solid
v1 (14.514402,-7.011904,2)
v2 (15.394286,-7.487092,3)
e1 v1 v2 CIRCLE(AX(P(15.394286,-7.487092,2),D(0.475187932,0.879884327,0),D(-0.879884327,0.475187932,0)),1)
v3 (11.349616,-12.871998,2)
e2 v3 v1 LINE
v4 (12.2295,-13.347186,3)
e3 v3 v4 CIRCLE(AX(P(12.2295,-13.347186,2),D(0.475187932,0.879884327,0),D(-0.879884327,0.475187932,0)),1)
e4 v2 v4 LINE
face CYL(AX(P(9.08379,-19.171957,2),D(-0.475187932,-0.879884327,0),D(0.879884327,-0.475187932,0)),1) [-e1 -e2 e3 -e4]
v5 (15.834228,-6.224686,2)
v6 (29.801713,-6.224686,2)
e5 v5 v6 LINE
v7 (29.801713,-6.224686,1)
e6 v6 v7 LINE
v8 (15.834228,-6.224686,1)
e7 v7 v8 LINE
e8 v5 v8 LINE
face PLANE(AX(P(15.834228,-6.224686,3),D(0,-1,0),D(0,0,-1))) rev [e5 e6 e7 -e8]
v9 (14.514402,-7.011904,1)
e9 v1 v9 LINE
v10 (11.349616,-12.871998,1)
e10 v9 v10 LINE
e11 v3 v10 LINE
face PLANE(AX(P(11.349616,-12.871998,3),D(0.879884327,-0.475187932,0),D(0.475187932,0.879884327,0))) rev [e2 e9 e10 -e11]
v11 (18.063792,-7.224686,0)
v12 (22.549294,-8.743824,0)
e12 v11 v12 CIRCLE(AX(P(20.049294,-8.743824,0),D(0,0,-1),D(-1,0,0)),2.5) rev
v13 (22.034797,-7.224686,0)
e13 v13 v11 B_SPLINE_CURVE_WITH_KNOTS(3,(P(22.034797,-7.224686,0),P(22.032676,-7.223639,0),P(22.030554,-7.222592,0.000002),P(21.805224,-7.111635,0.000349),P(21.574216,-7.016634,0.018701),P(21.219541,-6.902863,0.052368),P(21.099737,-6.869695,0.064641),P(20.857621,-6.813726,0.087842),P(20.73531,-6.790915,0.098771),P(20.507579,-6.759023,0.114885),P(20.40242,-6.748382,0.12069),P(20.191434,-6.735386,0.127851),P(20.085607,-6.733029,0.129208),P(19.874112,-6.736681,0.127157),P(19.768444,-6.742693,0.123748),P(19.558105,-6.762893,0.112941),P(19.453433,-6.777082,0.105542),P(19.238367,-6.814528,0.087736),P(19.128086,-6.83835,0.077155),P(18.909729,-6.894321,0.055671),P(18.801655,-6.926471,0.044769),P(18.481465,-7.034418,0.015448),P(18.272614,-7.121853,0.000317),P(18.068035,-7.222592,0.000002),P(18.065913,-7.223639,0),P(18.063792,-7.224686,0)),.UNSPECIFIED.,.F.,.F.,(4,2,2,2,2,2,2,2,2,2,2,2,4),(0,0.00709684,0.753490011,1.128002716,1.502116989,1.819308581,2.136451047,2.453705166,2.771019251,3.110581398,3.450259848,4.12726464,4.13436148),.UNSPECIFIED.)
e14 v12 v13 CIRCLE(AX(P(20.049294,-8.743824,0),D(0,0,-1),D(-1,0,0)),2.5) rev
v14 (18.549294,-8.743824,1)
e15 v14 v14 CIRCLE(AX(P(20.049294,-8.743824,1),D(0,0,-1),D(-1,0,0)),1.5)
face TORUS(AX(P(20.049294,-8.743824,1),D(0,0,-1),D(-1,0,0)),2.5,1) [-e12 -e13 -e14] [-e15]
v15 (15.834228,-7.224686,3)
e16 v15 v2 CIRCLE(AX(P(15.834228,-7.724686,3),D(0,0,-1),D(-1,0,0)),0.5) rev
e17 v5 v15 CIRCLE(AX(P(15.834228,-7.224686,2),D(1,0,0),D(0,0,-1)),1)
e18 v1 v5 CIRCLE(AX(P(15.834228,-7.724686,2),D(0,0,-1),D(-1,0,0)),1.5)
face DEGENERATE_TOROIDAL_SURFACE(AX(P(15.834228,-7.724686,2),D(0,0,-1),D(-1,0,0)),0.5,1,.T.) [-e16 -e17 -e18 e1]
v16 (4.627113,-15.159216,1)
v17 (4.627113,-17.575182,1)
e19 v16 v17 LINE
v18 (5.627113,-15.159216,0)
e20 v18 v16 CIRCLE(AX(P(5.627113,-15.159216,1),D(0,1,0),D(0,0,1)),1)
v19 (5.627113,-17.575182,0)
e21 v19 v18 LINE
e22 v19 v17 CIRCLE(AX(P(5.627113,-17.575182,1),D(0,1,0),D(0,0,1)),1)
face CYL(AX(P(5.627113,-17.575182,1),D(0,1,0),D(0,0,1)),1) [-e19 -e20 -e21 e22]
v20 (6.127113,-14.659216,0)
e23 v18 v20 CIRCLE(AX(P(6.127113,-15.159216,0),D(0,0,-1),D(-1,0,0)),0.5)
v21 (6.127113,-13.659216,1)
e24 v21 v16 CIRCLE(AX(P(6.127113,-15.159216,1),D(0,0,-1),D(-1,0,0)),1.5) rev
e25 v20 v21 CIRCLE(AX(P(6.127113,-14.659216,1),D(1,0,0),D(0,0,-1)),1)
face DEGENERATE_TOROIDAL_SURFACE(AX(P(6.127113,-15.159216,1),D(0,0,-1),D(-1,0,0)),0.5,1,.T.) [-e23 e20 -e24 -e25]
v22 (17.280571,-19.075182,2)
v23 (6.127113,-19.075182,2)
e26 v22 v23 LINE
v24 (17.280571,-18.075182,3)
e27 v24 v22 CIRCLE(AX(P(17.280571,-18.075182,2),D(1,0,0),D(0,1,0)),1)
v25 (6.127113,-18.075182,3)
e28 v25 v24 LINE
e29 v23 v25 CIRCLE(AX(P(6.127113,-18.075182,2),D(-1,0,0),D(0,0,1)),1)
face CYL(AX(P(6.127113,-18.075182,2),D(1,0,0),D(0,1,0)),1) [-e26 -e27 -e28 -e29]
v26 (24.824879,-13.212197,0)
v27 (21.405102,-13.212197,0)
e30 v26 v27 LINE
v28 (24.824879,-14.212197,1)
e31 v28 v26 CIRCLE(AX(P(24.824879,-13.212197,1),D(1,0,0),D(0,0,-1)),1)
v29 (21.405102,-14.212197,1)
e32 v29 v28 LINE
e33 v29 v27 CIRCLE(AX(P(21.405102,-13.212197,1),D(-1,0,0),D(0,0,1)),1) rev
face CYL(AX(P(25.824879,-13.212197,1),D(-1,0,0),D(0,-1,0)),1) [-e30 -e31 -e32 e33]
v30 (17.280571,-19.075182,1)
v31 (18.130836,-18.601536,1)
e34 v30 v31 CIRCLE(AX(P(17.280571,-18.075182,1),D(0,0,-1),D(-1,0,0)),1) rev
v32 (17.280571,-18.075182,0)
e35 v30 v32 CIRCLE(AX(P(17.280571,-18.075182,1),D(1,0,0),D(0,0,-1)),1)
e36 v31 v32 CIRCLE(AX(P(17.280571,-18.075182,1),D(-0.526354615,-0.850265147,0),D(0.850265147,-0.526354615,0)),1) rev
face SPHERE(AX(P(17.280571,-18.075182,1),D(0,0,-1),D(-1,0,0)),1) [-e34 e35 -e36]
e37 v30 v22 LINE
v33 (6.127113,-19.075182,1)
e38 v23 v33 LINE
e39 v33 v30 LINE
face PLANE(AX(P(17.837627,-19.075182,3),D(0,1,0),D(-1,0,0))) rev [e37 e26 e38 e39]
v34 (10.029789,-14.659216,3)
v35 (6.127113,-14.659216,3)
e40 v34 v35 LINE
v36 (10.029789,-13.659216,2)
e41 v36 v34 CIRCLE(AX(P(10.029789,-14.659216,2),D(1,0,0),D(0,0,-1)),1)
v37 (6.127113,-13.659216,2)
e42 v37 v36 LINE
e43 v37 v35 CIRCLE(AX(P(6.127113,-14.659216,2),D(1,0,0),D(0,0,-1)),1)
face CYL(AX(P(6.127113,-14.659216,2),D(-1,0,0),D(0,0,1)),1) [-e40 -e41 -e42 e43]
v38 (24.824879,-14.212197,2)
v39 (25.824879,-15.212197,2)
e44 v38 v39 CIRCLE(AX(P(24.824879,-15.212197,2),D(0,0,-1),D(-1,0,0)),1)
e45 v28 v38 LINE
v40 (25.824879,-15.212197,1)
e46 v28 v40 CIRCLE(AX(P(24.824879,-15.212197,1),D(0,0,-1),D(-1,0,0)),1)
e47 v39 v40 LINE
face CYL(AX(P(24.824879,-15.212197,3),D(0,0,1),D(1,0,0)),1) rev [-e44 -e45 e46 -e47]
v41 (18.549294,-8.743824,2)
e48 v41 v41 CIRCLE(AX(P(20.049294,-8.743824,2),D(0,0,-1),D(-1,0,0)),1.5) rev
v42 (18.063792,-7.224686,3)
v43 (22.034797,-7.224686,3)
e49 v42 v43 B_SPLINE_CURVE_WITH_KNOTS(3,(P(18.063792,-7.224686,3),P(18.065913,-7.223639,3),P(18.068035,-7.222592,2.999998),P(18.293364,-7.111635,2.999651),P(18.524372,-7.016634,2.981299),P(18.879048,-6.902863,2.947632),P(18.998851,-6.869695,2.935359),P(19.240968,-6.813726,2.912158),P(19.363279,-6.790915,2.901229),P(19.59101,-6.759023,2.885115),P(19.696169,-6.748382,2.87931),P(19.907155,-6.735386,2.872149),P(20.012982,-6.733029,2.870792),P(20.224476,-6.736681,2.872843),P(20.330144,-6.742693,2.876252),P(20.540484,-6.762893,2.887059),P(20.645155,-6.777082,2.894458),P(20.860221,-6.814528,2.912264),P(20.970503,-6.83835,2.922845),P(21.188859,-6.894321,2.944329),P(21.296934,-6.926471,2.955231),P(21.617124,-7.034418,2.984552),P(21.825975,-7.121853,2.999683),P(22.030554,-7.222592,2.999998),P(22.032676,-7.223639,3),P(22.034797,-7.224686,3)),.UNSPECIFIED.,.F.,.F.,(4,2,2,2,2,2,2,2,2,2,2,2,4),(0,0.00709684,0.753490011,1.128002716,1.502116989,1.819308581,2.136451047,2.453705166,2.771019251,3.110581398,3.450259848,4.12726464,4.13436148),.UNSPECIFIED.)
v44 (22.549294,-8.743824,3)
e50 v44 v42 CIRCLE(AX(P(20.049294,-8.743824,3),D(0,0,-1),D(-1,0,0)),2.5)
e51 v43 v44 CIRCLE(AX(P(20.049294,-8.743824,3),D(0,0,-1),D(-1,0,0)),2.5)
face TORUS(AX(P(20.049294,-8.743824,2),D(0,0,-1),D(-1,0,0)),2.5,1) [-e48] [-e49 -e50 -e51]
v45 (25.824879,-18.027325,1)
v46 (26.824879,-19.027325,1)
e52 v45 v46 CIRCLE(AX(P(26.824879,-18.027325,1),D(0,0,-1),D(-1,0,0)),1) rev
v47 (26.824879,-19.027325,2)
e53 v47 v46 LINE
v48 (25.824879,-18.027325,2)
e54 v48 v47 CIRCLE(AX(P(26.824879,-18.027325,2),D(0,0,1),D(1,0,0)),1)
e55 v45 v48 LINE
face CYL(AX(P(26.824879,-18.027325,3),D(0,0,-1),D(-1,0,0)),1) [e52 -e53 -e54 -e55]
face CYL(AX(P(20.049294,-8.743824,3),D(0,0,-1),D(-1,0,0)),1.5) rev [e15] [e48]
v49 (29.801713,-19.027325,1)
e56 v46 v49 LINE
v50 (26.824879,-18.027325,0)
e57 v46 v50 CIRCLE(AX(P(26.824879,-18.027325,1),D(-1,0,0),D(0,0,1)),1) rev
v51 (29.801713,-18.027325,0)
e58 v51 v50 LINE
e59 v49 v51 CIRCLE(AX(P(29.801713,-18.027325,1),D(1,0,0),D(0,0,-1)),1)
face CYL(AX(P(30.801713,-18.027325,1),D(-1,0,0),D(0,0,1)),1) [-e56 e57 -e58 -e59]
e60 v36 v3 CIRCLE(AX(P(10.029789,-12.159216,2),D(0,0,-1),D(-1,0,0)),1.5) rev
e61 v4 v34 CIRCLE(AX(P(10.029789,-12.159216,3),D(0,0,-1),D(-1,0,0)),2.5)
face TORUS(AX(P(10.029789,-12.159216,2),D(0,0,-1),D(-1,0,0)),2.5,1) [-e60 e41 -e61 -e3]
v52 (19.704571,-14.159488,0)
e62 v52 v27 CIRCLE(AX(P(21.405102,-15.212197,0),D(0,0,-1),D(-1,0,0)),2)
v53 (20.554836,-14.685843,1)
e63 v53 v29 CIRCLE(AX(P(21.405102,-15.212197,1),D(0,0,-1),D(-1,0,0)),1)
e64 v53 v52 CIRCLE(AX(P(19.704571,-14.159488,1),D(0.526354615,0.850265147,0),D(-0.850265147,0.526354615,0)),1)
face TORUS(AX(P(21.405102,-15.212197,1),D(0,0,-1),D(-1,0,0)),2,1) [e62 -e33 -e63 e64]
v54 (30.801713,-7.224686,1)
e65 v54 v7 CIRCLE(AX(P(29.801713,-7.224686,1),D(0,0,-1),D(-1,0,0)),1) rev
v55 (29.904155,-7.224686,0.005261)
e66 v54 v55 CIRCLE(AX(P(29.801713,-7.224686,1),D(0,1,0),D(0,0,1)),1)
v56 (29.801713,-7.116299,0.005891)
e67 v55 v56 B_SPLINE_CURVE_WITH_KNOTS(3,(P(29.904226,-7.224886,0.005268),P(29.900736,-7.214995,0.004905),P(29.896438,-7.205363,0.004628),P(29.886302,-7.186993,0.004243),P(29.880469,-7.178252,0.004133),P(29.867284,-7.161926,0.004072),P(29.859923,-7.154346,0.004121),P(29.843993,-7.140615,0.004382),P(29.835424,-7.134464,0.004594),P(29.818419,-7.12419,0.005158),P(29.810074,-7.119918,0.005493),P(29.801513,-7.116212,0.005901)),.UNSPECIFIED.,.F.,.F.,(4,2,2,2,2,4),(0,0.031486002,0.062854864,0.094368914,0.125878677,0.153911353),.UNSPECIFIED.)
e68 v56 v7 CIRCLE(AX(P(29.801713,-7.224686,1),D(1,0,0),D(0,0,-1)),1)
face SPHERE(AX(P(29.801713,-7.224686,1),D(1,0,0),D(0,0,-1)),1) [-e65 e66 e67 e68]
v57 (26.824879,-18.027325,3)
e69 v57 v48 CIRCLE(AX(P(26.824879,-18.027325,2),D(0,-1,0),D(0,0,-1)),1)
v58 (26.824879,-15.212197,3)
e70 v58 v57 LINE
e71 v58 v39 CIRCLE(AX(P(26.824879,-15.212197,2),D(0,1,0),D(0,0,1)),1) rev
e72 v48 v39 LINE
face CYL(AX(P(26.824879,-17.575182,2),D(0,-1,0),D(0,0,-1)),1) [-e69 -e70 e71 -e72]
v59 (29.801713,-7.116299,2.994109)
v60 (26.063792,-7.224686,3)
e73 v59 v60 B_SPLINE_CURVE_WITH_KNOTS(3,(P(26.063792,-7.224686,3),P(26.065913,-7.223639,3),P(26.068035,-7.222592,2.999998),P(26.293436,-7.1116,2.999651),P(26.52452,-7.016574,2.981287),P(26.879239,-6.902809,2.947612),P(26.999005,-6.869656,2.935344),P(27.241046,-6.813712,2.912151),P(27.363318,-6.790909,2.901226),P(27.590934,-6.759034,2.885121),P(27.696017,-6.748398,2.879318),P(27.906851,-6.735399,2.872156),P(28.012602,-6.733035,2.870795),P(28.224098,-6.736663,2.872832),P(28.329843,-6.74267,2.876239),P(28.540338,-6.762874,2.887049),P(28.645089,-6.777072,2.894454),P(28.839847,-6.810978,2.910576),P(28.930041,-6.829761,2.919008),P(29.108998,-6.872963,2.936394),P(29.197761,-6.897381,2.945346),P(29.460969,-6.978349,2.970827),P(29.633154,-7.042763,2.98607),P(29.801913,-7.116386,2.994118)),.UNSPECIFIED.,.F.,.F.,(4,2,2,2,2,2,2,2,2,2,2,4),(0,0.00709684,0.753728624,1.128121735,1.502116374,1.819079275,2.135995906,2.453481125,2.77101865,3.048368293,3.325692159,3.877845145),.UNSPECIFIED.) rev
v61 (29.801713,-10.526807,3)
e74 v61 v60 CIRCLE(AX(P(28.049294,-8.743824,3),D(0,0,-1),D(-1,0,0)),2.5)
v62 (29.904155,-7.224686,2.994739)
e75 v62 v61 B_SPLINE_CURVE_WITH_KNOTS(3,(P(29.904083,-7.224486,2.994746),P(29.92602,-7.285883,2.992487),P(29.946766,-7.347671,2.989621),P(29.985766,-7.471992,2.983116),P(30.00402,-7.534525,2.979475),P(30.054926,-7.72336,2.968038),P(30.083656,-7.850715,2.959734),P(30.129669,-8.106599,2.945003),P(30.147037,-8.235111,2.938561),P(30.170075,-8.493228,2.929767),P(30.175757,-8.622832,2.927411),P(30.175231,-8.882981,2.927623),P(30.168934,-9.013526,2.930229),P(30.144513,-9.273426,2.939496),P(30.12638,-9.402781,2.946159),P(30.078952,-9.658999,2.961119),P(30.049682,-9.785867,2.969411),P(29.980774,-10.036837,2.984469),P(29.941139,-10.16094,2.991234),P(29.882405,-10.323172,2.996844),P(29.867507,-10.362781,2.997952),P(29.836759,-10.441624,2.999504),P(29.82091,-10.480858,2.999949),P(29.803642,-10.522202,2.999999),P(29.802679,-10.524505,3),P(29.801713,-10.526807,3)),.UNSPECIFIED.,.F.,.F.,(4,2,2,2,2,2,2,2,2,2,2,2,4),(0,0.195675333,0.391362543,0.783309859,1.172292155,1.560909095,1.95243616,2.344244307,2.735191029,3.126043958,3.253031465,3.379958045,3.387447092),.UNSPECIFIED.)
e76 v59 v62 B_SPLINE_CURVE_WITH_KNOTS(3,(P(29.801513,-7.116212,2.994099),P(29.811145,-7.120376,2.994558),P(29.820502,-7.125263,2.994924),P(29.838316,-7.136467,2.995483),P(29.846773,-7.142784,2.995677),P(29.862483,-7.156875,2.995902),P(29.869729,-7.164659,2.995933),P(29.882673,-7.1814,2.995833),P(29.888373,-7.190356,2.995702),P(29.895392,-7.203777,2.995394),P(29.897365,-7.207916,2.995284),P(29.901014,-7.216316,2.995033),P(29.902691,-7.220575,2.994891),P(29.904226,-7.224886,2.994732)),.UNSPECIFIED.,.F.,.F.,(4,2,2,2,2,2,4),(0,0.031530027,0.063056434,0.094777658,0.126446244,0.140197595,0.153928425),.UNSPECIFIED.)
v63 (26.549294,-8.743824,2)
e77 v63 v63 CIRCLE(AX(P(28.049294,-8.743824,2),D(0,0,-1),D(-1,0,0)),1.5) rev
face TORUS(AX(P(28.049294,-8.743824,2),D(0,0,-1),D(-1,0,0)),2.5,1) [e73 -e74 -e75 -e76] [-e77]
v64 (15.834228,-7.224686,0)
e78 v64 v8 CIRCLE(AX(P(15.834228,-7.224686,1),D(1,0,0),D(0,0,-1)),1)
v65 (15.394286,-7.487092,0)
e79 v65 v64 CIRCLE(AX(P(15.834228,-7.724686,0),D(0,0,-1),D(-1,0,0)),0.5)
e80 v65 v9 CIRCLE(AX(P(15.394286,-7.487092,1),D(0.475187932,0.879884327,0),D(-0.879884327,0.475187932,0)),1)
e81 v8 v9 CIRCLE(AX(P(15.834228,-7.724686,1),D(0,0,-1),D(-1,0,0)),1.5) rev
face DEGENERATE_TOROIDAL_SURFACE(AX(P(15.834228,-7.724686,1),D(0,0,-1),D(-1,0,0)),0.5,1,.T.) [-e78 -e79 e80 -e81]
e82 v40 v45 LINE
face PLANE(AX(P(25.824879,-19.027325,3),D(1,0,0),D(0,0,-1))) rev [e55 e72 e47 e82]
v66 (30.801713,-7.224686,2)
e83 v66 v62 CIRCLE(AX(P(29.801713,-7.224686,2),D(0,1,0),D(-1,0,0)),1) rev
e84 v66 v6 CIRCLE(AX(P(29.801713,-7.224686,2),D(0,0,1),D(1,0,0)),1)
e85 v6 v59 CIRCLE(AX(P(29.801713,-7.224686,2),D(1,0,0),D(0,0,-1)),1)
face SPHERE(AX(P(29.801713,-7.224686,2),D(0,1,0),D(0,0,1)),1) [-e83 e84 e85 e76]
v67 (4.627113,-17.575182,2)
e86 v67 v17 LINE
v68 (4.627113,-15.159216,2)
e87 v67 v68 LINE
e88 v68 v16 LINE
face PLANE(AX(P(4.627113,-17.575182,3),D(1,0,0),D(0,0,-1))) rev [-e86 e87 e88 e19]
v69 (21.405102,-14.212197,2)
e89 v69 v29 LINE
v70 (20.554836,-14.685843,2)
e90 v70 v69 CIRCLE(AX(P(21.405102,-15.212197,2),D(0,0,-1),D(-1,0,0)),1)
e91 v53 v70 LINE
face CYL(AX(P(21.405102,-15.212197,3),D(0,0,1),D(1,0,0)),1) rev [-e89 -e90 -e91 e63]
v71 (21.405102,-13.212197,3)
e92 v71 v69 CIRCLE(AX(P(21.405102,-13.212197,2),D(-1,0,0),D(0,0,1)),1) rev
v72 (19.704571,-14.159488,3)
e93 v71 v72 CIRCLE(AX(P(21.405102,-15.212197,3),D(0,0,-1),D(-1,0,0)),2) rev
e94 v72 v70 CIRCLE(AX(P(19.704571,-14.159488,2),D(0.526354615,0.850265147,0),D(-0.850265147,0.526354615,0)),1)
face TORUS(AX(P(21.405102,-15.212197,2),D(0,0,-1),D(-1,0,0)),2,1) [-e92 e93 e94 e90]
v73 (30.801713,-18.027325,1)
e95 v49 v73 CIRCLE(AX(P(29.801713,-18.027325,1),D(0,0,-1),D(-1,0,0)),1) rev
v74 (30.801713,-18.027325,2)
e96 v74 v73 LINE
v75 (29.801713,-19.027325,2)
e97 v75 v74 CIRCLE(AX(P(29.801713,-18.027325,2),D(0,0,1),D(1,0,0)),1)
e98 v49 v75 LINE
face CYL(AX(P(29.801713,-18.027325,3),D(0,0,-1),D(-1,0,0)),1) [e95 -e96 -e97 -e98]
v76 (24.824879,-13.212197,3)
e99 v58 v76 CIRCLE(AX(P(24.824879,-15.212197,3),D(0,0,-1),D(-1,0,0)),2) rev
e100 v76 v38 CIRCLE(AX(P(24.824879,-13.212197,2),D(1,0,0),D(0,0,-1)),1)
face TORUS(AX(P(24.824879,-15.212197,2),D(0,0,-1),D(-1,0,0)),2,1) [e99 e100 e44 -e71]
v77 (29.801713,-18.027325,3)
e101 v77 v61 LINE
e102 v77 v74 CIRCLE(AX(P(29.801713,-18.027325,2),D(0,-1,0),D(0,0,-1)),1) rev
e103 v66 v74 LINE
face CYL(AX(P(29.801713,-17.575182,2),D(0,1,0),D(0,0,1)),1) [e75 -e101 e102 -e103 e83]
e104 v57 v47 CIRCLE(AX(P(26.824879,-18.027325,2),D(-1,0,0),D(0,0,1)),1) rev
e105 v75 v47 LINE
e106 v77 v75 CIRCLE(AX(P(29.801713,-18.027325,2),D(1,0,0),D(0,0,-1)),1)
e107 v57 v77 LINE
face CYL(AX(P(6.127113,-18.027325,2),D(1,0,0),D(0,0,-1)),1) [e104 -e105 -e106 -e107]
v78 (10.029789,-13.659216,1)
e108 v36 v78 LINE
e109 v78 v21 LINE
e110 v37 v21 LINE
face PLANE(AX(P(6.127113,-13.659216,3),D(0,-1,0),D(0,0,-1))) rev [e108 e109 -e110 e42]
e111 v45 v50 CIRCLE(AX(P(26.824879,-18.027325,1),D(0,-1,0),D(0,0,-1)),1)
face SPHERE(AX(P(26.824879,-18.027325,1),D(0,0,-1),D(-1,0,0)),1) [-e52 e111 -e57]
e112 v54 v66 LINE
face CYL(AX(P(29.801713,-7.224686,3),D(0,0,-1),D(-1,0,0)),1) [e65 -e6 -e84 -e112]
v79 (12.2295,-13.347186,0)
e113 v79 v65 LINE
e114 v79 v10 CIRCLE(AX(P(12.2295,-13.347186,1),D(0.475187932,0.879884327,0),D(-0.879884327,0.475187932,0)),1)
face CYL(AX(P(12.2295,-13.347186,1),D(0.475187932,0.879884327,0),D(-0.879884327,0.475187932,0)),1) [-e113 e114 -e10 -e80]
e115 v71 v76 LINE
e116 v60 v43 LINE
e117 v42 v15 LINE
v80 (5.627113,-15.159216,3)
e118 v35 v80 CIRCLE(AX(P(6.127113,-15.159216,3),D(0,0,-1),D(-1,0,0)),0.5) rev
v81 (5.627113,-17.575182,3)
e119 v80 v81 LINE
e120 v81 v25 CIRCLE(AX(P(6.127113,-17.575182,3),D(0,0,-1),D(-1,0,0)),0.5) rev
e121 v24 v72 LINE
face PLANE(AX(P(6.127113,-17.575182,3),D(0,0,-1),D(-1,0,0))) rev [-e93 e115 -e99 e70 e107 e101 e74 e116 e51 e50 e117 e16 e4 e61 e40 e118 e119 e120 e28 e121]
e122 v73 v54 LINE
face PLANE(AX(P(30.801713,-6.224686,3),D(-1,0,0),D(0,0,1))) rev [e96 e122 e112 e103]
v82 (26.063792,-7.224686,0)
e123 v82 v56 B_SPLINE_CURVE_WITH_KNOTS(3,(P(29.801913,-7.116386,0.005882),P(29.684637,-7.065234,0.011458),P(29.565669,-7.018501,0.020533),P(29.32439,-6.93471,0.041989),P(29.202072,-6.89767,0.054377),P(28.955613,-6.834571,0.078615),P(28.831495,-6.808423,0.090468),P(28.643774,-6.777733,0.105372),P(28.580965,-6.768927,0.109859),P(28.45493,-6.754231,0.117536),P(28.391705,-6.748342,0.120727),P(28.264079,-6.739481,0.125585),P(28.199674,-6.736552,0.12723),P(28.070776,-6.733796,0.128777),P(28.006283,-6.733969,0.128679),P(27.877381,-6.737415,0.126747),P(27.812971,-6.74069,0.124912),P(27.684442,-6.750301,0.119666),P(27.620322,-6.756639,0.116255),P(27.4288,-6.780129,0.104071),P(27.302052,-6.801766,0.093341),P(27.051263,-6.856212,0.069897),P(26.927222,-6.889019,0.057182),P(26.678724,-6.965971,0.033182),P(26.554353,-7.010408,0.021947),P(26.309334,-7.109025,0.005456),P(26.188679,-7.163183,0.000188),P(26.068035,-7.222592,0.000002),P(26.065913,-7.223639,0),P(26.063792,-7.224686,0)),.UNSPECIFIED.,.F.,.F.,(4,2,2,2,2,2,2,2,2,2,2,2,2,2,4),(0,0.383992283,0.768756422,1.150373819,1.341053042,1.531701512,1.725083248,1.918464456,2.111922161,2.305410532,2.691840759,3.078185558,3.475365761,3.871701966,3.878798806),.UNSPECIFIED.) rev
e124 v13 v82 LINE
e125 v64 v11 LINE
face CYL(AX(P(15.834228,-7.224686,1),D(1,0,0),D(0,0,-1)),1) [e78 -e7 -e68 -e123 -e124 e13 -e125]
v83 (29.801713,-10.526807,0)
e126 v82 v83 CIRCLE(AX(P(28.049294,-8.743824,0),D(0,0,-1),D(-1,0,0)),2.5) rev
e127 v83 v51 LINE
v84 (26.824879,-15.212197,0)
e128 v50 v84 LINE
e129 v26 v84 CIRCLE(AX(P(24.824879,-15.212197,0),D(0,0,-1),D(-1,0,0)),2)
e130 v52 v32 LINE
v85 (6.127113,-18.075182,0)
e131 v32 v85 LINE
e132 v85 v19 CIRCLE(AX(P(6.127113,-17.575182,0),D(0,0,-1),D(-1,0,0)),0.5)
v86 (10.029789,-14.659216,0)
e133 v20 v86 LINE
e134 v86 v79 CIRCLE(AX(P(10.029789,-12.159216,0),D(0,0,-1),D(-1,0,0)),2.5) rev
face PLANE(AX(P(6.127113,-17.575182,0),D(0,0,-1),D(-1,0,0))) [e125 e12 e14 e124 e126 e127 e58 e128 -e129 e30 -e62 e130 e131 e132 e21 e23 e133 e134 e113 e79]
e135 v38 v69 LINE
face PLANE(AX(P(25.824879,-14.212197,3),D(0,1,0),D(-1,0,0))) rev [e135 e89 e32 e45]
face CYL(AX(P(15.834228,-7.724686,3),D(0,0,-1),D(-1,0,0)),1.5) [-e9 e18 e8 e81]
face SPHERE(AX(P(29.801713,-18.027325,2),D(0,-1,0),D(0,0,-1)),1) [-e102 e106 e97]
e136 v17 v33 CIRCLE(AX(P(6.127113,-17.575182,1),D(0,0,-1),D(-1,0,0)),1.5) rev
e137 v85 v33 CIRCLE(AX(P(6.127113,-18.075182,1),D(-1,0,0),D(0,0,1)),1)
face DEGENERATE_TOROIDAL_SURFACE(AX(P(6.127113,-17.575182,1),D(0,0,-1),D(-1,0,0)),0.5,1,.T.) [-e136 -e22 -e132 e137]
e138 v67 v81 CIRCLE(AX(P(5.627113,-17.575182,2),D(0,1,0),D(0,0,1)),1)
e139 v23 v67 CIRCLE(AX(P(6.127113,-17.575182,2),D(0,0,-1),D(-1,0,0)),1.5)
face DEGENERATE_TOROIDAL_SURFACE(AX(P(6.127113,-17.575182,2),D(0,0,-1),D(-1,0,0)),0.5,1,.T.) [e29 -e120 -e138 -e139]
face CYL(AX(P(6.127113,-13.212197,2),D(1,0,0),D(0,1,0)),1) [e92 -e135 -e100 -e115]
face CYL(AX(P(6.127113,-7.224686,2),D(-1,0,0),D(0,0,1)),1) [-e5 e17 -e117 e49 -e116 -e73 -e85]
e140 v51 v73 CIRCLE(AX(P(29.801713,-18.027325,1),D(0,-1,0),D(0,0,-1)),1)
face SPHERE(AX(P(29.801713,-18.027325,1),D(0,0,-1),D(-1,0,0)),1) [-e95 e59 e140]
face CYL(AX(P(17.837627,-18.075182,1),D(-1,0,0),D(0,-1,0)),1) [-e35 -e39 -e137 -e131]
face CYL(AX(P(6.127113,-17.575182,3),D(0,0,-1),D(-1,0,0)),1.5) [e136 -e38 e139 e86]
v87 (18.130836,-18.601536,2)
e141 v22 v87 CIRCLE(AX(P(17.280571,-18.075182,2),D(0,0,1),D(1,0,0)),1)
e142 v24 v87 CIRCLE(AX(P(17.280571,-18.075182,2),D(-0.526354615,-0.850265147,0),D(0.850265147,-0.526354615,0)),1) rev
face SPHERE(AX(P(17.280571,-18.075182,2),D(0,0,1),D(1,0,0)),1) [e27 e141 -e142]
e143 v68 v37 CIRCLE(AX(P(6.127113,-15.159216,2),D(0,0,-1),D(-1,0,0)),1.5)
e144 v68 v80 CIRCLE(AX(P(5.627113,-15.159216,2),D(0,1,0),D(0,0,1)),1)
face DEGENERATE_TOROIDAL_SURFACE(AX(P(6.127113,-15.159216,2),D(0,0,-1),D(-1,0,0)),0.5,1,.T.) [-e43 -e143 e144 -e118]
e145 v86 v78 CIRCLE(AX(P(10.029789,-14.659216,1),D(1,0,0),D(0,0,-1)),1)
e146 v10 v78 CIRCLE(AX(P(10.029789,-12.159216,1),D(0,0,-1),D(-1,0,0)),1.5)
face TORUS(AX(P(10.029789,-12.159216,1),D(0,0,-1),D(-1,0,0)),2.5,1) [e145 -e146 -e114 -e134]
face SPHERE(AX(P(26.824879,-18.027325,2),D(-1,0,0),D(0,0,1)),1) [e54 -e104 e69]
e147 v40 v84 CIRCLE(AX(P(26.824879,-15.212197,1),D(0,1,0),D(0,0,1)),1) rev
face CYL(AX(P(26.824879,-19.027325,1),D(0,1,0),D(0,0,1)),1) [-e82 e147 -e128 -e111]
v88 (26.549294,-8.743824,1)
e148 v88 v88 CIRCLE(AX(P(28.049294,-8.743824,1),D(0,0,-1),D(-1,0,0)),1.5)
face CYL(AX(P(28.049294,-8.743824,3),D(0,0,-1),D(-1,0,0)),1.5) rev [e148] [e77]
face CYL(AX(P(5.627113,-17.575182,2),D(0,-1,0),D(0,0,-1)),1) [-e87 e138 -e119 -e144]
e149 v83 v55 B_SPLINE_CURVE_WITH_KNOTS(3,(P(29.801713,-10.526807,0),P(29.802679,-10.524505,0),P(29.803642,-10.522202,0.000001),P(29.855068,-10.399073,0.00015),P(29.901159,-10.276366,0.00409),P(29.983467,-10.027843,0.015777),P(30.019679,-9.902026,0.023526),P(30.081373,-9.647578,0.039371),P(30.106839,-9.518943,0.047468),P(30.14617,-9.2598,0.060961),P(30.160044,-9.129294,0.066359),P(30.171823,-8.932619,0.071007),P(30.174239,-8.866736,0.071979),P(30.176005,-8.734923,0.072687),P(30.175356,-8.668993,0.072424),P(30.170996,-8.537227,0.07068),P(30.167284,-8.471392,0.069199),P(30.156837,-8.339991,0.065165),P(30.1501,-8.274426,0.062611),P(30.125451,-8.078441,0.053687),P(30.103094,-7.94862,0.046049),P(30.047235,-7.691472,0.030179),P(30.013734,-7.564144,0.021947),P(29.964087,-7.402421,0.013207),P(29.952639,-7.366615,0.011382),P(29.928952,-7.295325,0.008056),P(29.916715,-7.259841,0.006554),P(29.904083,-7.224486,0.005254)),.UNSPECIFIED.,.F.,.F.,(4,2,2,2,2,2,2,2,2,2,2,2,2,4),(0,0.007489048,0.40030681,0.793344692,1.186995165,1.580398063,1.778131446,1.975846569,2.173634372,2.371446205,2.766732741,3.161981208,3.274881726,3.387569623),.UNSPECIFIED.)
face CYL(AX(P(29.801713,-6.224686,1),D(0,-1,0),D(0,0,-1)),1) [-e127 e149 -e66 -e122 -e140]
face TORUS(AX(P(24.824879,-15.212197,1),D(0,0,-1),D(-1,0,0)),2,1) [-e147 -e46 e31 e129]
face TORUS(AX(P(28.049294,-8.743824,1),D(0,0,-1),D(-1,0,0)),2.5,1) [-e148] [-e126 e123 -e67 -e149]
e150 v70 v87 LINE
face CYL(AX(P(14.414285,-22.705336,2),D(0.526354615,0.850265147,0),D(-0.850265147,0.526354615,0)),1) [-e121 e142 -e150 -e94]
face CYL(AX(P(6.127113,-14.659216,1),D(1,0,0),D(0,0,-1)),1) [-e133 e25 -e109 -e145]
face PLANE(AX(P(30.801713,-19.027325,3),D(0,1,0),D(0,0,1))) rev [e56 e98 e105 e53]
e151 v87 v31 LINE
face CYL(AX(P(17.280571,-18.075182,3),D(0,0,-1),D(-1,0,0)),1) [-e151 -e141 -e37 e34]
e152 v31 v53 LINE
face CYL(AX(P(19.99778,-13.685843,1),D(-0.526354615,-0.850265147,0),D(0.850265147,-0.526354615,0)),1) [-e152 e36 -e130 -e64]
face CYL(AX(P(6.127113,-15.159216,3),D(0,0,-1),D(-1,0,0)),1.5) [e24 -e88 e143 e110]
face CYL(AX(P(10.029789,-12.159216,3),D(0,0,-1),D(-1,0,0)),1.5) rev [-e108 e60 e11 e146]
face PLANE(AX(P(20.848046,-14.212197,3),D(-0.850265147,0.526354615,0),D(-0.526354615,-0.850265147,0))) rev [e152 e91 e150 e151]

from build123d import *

# Parameters (mm, degrees)
SKETCH1_R           = 1.5
BOSS_EXTRUDE1_DEPTH = 3
FILLET1_R           = 1


with BuildPart() as part:
    # Sketch1 → Boss-Extrude1 (new body)
    with BuildSketch(Plane.XY):
        with BuildLine():
            Line((15.834228158, -6.224686262), (30.801713335, -6.224686262))
            Line((30.801713335, -6.224686262), (30.801713335, -19.027324957))
            Line((30.801713335, -19.027324957), (25.824879418, -19.027324957))
            Line((25.824879418, -19.027324957), (25.824879418, -14.212197487))
            Line((25.824879418, -14.212197487), (20.8480455, -14.212197487))
            Line((20.8480455, -14.212197487), (17.837626699, -19.075181704))
            Line((17.837626699, -19.075181704), (6.127112784, -19.075181704))
            ThreePointArc((6.127112784, -19.075181704), (5.066452612, -18.635841876), (4.627112784, -17.575181704))
            Line((4.627112784, -17.575181704), (4.627112784, -15.15921594))
            ThreePointArc((4.627112784, -15.15921594), (5.066452612, -14.098555769), (6.127112784, -13.65921594))
            Line((6.127112784, -13.65921594), (10.029789066, -13.65921594))
            ThreePointArc((10.029789066, -13.65921594), (10.798172809, -13.447465304), (11.349615557, -12.871997838))
            Line((11.349615557, -12.871997838), (14.514401667, -7.011904364))
            ThreePointArc((14.514401667, -7.011904364), (15.065844415, -6.436436898), (15.834228158, -6.224686262))
        make_face()
        with Locations((20.049294378, -8.743824417)):
            Circle(SKETCH1_R, mode=Mode.SUBTRACT)
        with Locations((28.049294378, -8.743824417)):
            Circle(SKETCH1_R, mode=Mode.SUBTRACT)
    extrude(amount=BOSS_EXTRUDE1_DEPTH)

    # Fillet1
    # the kernel refuses this fillet: 1 mm, written as the material it adds along each edge
    with BuildSketch(Plane(origin=(25.824879418, -14.212197487, 0), x_dir=(0, -1, 0), z_dir=(0, 0, 1))) as fillet1_piece_1:
        with BuildLine():
            CenterArc((FILLET1_R, -FILLET1_R), FILLET1_R, 90, 90)
            Line((0, -FILLET1_R), (0, 0))
            Line((0, 0), (FILLET1_R, 0))
        make_face()
    extrude(amount=3)
    with BuildSketch(Plane(origin=(20.8480455, -14.212197487, 0), x_dir=(1, 0, 0), z_dir=(0, 0, 1))) as fillet1_piece_2:
        with BuildLine():
            CenterArc((FILLET1_R * 0.557056098593, -FILLET1_R), FILLET1_R, 90, 58.240519915)
            Line((-FILLET1_R * 0.293209048095, -FILLET1_R * 0.473645385384), (0, 0))
            Line((0, 0), (FILLET1_R * 0.557056098593, 0))
        make_face()
    extrude(amount=3)
    # the kernel refuses this fillet: 1 mm, written as the material it takes off along each edge
    with BuildSketch(Plane(origin=(29.801713335, -18.027324957, 1), x_dir=(1, 0, 0), z_dir=(0, -1, 0))) as fillet1_2_piece_1_section:
        Polygon((0, 0), (FILLET1_R, 0), (FILLET1_R, -FILLET1_R), (0, -FILLET1_R), align=None)
    fillet1_2_piece_1 = extrude(amount=FILLET1_R, mode=Mode.PRIVATE)
    fillet1_2_piece_1 = fillet1_2_piece_1 - Plane(origin=(29.801713335, -18.027324957, 1), x_dir=(-0.7071067811865475, 0, 0.7071067811865475), z_dir=(0, -1, 0)) * Sphere(FILLET1_R, mode=Mode.PRIVATE)
    add(fillet1_2_piece_1, mode=Mode.SUBTRACT)
    with BuildSketch(Plane(origin=(26.824879418, -18.027324957, 1), x_dir=(0, 0, -1), z_dir=(0, -1, 0))) as fillet1_2_piece_2_section:
        Polygon((0, 0), (FILLET1_R, 0), (FILLET1_R, -FILLET1_R), (0, -FILLET1_R), align=None)
    fillet1_2_piece_2 = extrude(amount=FILLET1_R, mode=Mode.PRIVATE)
    fillet1_2_piece_2 = fillet1_2_piece_2 - Plane(origin=(26.824879418, -18.027324957, 1), x_dir=(0.7071067811865475, 0, 0.7071067811865475), z_dir=(0, -1, 0)) * Sphere(FILLET1_R, mode=Mode.PRIVATE)
    add(fillet1_2_piece_2, mode=Mode.SUBTRACT)
    with BuildSketch(Plane(origin=(17.280570601, -18.075181704, 1), x_dir=(0.8502651466878635, -0.5263546146162928, 0), z_dir=(0, 0, -1))) as fillet1_2_piece_3_section:
        Polygon((0, 0), (FILLET1_R, 0), (FILLET1_R, FILLET1_R * 0.557056098593), (FILLET1_R * 0.526354614616, FILLET1_R * 0.850265146688), align=None)
    fillet1_2_piece_3 = extrude(amount=FILLET1_R, mode=Mode.PRIVATE)
    fillet1_2_piece_3 = fillet1_2_piece_3 - Plane(origin=(17.280570601, -18.075181704, 1), x_dir=(-0.48664431846252326, 0.8736001987798231, 0), z_dir=(0, 0, -1)) * Sphere(FILLET1_R, mode=Mode.PRIVATE)
    add(fillet1_2_piece_3, mode=Mode.SUBTRACT)
    with BuildSketch(Plane(origin=(29.801713335, -7.224686262, 1), x_dir=(1, 0, 0), z_dir=(0, 1, 0))) as fillet1_2_piece_4_section:
        Polygon((0, 0), (FILLET1_R, 0), (FILLET1_R, FILLET1_R), (0, FILLET1_R), align=None)
    fillet1_2_piece_4 = extrude(amount=FILLET1_R, mode=Mode.PRIVATE)
    fillet1_2_piece_4 = fillet1_2_piece_4 - Plane(origin=(29.801713335, -7.224686262, 1), x_dir=(-0.7071067811865475, 0, 0.7071067811865475), z_dir=(0, 1, 0)) * Sphere(FILLET1_R, mode=Mode.PRIVATE)
    add(fillet1_2_piece_4, mode=Mode.SUBTRACT)
    with BuildSketch(Plane(origin=(29.801713335, -18.027324957, 2), x_dir=(0, -1, 0), z_dir=(1, 0, 0))) as fillet1_2_piece_5_section:
        Polygon((0, 0), (FILLET1_R, 0), (FILLET1_R, -FILLET1_R), (0, -FILLET1_R), align=None)
    fillet1_2_piece_5 = extrude(amount=FILLET1_R, mode=Mode.PRIVATE)
    fillet1_2_piece_5 = fillet1_2_piece_5 - Plane(origin=(29.801713335, -18.027324957, 2), x_dir=(0, 0.7071067811865475, -0.7071067811865475), z_dir=(1, 0, 0)) * Sphere(FILLET1_R, mode=Mode.PRIVATE)
    add(fillet1_2_piece_5, mode=Mode.SUBTRACT)
    with BuildSketch(Plane(origin=(26.824879418, -18.027324957, 2), x_dir=(-1, 0, 0), z_dir=(0, -1, 0))) as fillet1_2_piece_6_section:
        Polygon((0, 0), (FILLET1_R, 0), (FILLET1_R, -FILLET1_R), (0, -FILLET1_R), align=None)
    fillet1_2_piece_6 = extrude(amount=FILLET1_R, mode=Mode.PRIVATE)
    fillet1_2_piece_6 = fillet1_2_piece_6 - Plane(origin=(26.824879418, -18.027324957, 2), x_dir=(0.7071067811865475, 0, -0.7071067811865475), z_dir=(0, -1, 0)) * Sphere(FILLET1_R, mode=Mode.PRIVATE)
    add(fillet1_2_piece_6, mode=Mode.SUBTRACT)
    with BuildSketch(Plane(origin=(17.280570601, -18.075181704, 2), x_dir=(0.8502651466878635, -0.5263546146162928, 0), z_dir=(0, 0, 1))) as fillet1_2_piece_7_section:
        Polygon((0, 0), (FILLET1_R, 0), (FILLET1_R, -FILLET1_R * 0.557056098593), (FILLET1_R * 0.526354614616, -FILLET1_R * 0.850265146688), align=None)
    fillet1_2_piece_7 = extrude(amount=FILLET1_R, mode=Mode.PRIVATE)
    fillet1_2_piece_7 = fillet1_2_piece_7 - Plane(origin=(17.280570601, -18.075181704, 2), x_dir=(-0.48664431846252326, 0.8736001987798231, 0), z_dir=(0, 0, 1)) * Sphere(FILLET1_R, mode=Mode.PRIVATE)
    add(fillet1_2_piece_7, mode=Mode.SUBTRACT)
    with BuildSketch(Plane(origin=(29.801713335, -7.224686262, 2), x_dir=(1, 0, 0), z_dir=(0, 1, 0))) as fillet1_2_piece_8_section:
        Polygon((0, 0), (FILLET1_R, 0), (FILLET1_R, -FILLET1_R), (0, -FILLET1_R), align=None)
    fillet1_2_piece_8 = extrude(amount=FILLET1_R, mode=Mode.PRIVATE)
    fillet1_2_piece_8 = fillet1_2_piece_8 - Plane(origin=(29.801713335, -7.224686262, 2), x_dir=(-0.7071067811865475, 0, -0.7071067811865475), z_dir=(0, 1, 0)) * Sphere(FILLET1_R, mode=Mode.PRIVATE)
    add(fillet1_2_piece_8, mode=Mode.SUBTRACT)
    with BuildSketch(Plane(origin=(15.834228158, -7.724686262, 3), x_dir=(-0.8798843273453182, 0.47518793176182095, 0), z_dir=(-0.47518793176182095, -0.8798843273453182, 0))) as fillet1_2_piece_9:
        with BuildLine():
            CenterArc((1.5 - FILLET1_R, FILLET1_R), FILLET1_R, 270, 90)
            Line((1.5, FILLET1_R), (1.5, 0))
            Line((1.5, 0), (1.5 - FILLET1_R, 0))
        make_face()
    revolve(axis=Axis((15.834228158, -7.724686262, 3), (0, 0, -1)), revolution_arc=61.62841305, mode=Mode.SUBTRACT)
    with BuildSketch(Plane(origin=(29.801713335, -19.027324957, 0), x_dir=(0, 1, 0), z_dir=(-1, 0, 0))) as fillet1_2_piece_10:
        with BuildLine():
            CenterArc((FILLET1_R, -FILLET1_R), FILLET1_R, 90, 90)
            Line((0, -FILLET1_R), (0, 0))
            Line((0, 0), (FILLET1_R, 0))
        make_face()
    extrude(amount=2.976833917, mode=Mode.SUBTRACT)
    with BuildSketch(Plane(origin=(25.824879418, -18.027324957, 0), x_dir=(1, 0, 0), z_dir=(0, 1, 0))) as fillet1_2_piece_11:
        with BuildLine():
            CenterArc((FILLET1_R, -FILLET1_R), FILLET1_R, 90, 90)
            Line((0, -FILLET1_R), (0, 0))
            Line((0, 0), (FILLET1_R, 0))
        make_face()
    extrude(amount=2.815127471, mode=Mode.SUBTRACT)
    with BuildSketch(Plane(origin=(24.824879418, -14.212197487, 0), x_dir=(0, 1, 0), z_dir=(-1, 0, 0))) as fillet1_2_piece_12:
        with BuildLine():
            CenterArc((FILLET1_R, -FILLET1_R), FILLET1_R, 90, 90)
            Line((0, -FILLET1_R), (0, 0))
            Line((0, 0), (FILLET1_R, 0))
        make_face()
    extrude(amount=3.419777819, mode=Mode.SUBTRACT)
    with BuildSketch(Plane(origin=(20.554836452, -14.685842872, 0), x_dir=(-0.8502651466878635, 0.5263546146162928, 0), z_dir=(-0.5263546146162928, -0.8502651466878635, 0))) as fillet1_2_piece_13:
        with BuildLine():
            CenterArc((FILLET1_R, -FILLET1_R), FILLET1_R, 90, 90)
            Line((0, -FILLET1_R), (0, 0))
            Line((0, 0), (FILLET1_R, 0))
        make_face()
    extrude(amount=4.60526162, mode=Mode.SUBTRACT)
    with BuildSketch(Plane(origin=(17.280570601, -19.075181704, 0), x_dir=(0, 1, 0), z_dir=(-1, 0, 0))) as fillet1_2_piece_14:
        with BuildLine():
            CenterArc((FILLET1_R, -FILLET1_R), FILLET1_R, 90, 90)
            Line((0, -FILLET1_R), (0, 0))
            Line((0, 0), (FILLET1_R, 0))
        make_face()
    extrude(amount=11.153457816, mode=Mode.SUBTRACT)
    with BuildSketch(Plane(origin=(6.127112784, -17.575181704, 0), x_dir=(0, -1, 0), z_dir=(1, 0, 0))) as fillet1_2_piece_15:
        with BuildLine():
            CenterArc((1.5 - FILLET1_R, -FILLET1_R), FILLET1_R, 0, 90)
            Line((1.5, -FILLET1_R), (1.5, 0))
            Line((1.5, 0), (1.5 - FILLET1_R, 0))
        make_face()
    revolve(axis=Axis((6.127112784, -17.575181704, 0), (0, 0, -1)), revolution_arc=90, mode=Mode.SUBTRACT)
    with BuildSketch(Plane(origin=(4.627112784, -17.575181704, 0), x_dir=(0, 0, 1), z_dir=(0, 1, 0))) as fillet1_2_piece_16:
        with BuildLine():
            CenterArc((FILLET1_R, FILLET1_R), FILLET1_R, 180, 90)
            Line((0, FILLET1_R), (0, 0))
            Line((0, 0), (FILLET1_R, 0))
        make_face()
    extrude(amount=2.415965764, mode=Mode.SUBTRACT)
    with BuildSketch(Plane(origin=(6.127112784, -15.15921594, 0), x_dir=(-1, 0, 0), z_dir=(0, -1, 0))) as fillet1_2_piece_17:
        with BuildLine():
            CenterArc((1.5 - FILLET1_R, -FILLET1_R), FILLET1_R, 0, 90)
            Line((1.5 - FILLET1_R, 0), (1.5, 0))
            Line((1.5, 0), (1.5, -FILLET1_R))
        make_face()
    revolve(axis=Axis((6.127112784, -15.15921594, 0), (0, 0, -1)), revolution_arc=90, mode=Mode.SUBTRACT)
    with BuildSketch(Plane(origin=(11.349615557, -12.871997838, 3), x_dir=(0.8798843273453177, -0.4751879317618219, 0), z_dir=(0.4751879317618219, 0.8798843273453176, 0))) as fillet1_2_piece_18:
        with BuildLine():
            CenterArc((FILLET1_R, FILLET1_R), FILLET1_R, 180, 90)
            Line((0, FILLET1_R), (0, 0))
            Line((0, 0), (FILLET1_R, 0))
        make_face()
    extrude(amount=6.660072571, mode=Mode.SUBTRACT)
    with BuildSketch(Plane(origin=(6.127112784, -13.65921594, 0), x_dir=(0, 0, 1), z_dir=(1, 0, 0))) as fillet1_2_piece_19:
        with BuildLine():
            CenterArc((FILLET1_R, FILLET1_R), FILLET1_R, 180, 90)
            Line((0, FILLET1_R), (0, 0))
            Line((0, 0), (FILLET1_R, 0))
        make_face()
    extrude(amount=3.902676282, mode=Mode.SUBTRACT)
    with BuildSketch(Plane(origin=(10.029789066, -12.15921594, 0), x_dir=(0, -1, 0), z_dir=(-1, 0, 0))) as fillet1_2_piece_20:
        with BuildLine():
            CenterArc((1.5 + FILLET1_R, FILLET1_R), FILLET1_R, 180, 90)
            Line((1.5, FILLET1_R), (1.5, 0))
            Line((1.5, 0), (1.5 + FILLET1_R, 0))
        make_face()
    revolve(axis=Axis((10.029789066, -12.15921594, 0), (0, 0, 1)), revolution_arc=61.62841305, mode=Mode.SUBTRACT)
    with BuildSketch(Plane(origin=(11.349615557, -12.871997838, 0), x_dir=(0.8798843273453177, -0.4751879317618219, 0), z_dir=(0.4751879317618219, 0.8798843273453176, 0))) as fillet1_2_piece_21:
        with BuildLine():
            CenterArc((FILLET1_R, -FILLET1_R), FILLET1_R, 90, 90)
            Line((0, -FILLET1_R), (0, 0))
            Line((0, 0), (FILLET1_R, 0))
        make_face()
    extrude(amount=6.660072571, mode=Mode.SUBTRACT)
    with BuildSketch(Plane(origin=(15.834228158, -7.724686262, 0), x_dir=(-0.8798843273453182, 0.47518793176182095, 0), z_dir=(-0.47518793176182095, -0.8798843273453182, 0))) as fillet1_2_piece_22:
        with BuildLine():
            CenterArc((1.5 - FILLET1_R, -FILLET1_R), FILLET1_R, 0, 90)
            Line((1.5, -FILLET1_R), (1.5, 0))
            Line((1.5, 0), (1.5 - FILLET1_R, 0))
        make_face()
    revolve(axis=Axis((15.834228158, -7.724686262, 0), (0, 0, -1)), revolution_arc=61.62841305, mode=Mode.SUBTRACT)
    with BuildSketch(Plane(origin=(15.834228158, -6.224686262, 0), x_dir=(0, -1, 0), z_dir=(1, 0, 0))) as fillet1_2_piece_23:
        with BuildLine():
            CenterArc((FILLET1_R, -FILLET1_R), FILLET1_R, 90, 90)
            Line((0, -FILLET1_R), (0, 0))
            Line((0, 0), (FILLET1_R, 0))
        make_face()
    extrude(amount=13.967485176, mode=Mode.SUBTRACT)
    with BuildSketch(Plane(origin=(30.801713335, -7.224686262, 0), x_dir=(-1, 0, 0), z_dir=(0, -1, 0))) as fillet1_2_piece_24:
        with BuildLine():
            CenterArc((FILLET1_R, -FILLET1_R), FILLET1_R, 90, 90)
            Line((0, -FILLET1_R), (0, 0))
            Line((0, 0), (FILLET1_R, 0))
        make_face()
    extrude(amount=10.802638696, mode=Mode.SUBTRACT)
    with BuildSketch(Plane(origin=(10.029789066, -12.15921594, 3), x_dir=(0, -1, 0), z_dir=(-1, 0, 0))) as fillet1_2_piece_25:
        with BuildLine():
            CenterArc((1.5 + FILLET1_R, -FILLET1_R), FILLET1_R, 90, 90)
            Line((1.5, -FILLET1_R), (1.5, 0))
            Line((1.5, 0), (1.5 + FILLET1_R, 0))
        make_face()
    revolve(axis=Axis((10.029789066, -12.15921594, 3), (0, 0, 1)), revolution_arc=61.62841305, mode=Mode.SUBTRACT)
    with BuildSketch(Plane(origin=(30.801713335, -19.027324957, 1), x_dir=(0, 1, 0), z_dir=(0, 0, 1)), Plane(origin=(25.824879418, -19.027324957, 1), x_dir=(1, 0, 0), z_dir=(0, 0, 1)), Plane(origin=(30.801713335, -6.224686262, 1), x_dir=(-1, 0, 0), z_dir=(0, 0, 1))) as fillet1_2_piece_26:
        with BuildLine():
            CenterArc((FILLET1_R, FILLET1_R), FILLET1_R, 180, 90)
            Line((0, FILLET1_R), (0, 0))
            Line((0, 0), (FILLET1_R, 0))
        make_face()
    extrude(amount=1, mode=Mode.SUBTRACT)
    with BuildSketch(Plane(origin=(17.837626699, -19.075181704, 1), x_dir=(0.5263546146162922, 0.8502651466878639, 0), z_dir=(0, 0, 1))) as fillet1_2_piece_27:
        with BuildLine():
            CenterArc((FILLET1_R * 0.557056098593, FILLET1_R), FILLET1_R, 211.759480085, 58.240519915)
            Line((-FILLET1_R * 0.293209048095, FILLET1_R * 0.473645385384), (0, 0))
            Line((0, 0), (FILLET1_R * 0.557056098593, 0))
        make_face()
    extrude(amount=1, mode=Mode.SUBTRACT)
    with BuildSketch(Plane(origin=(6.127112784, -13.65921594, 3), x_dir=(0, 0, -1), z_dir=(1, 0, 0))) as fillet1_2_piece_28:
        with BuildLine():
            CenterArc((FILLET1_R, -FILLET1_R), FILLET1_R, 90, 90)
            Line((0, -FILLET1_R), (0, 0))
            Line((0, 0), (FILLET1_R, 0))
        make_face()
    extrude(amount=3.902676282, mode=Mode.SUBTRACT)
    with BuildSketch(Plane(origin=(6.127112784, -15.15921594, 3), x_dir=(-1, 0, 0), z_dir=(0, -1, 0))) as fillet1_2_piece_29:
        with BuildLine():
            CenterArc((1.5 - FILLET1_R, FILLET1_R), FILLET1_R, 270, 90)
            Line((1.5 - FILLET1_R, 0), (1.5, 0))
            Line((1.5, 0), (1.5, FILLET1_R))
        make_face()
    revolve(axis=Axis((6.127112784, -15.15921594, 3), (0, 0, -1)), revolution_arc=90, mode=Mode.SUBTRACT)
    with BuildSketch(Plane(origin=(4.627112784, -17.575181704, 3), x_dir=(0, 0, -1), z_dir=(0, 1, 0))) as fillet1_2_piece_30:
        with BuildLine():
            CenterArc((FILLET1_R, -FILLET1_R), FILLET1_R, 90, 90)
            Line((0, -FILLET1_R), (0, 0))
            Line((0, 0), (FILLET1_R, 0))
        make_face()
    extrude(amount=2.415965764, mode=Mode.SUBTRACT)
    with BuildSketch(Plane(origin=(20.049294378, -8.743824417, 0), x_dir=(1, 0, 0), z_dir=(0, -1, 0))) as fillet1_2_piece_31:
        with BuildLine():
            CenterArc((1.5 + FILLET1_R, FILLET1_R), FILLET1_R, 180, 90)
            Line((1.5, FILLET1_R), (1.5, 0))
            Line((1.5, 0), (1.5 + FILLET1_R, 0))
        make_face()
    revolve(axis=Axis((20.049294378, -8.743824417, 0), (0, 0, 1)), mode=Mode.SUBTRACT)
    with BuildSketch(Plane(origin=(20.049294378, -8.743824417, 3), x_dir=(1, 0, 0), z_dir=(0, -1, 0))) as fillet1_2_piece_32:
        with BuildLine():
            CenterArc((1.5 + FILLET1_R, -FILLET1_R), FILLET1_R, 90, 90)
            Line((1.5, -FILLET1_R), (1.5, 0))
            Line((1.5, 0), (1.5 + FILLET1_R, 0))
        make_face()
    revolve(axis=Axis((20.049294378, -8.743824417, 3), (0, 0, 1)), mode=Mode.SUBTRACT)
    with BuildSketch(Plane(origin=(6.127112784, -17.575181704, 3), x_dir=(0, -1, 0), z_dir=(1, 0, 0))) as fillet1_2_piece_33:
        with BuildLine():
            CenterArc((1.5 - FILLET1_R, FILLET1_R), FILLET1_R, 270, 90)
            Line((1.5, FILLET1_R), (1.5, 0))
            Line((1.5, 0), (1.5 - FILLET1_R, 0))
        make_face()
    revolve(axis=Axis((6.127112784, -17.575181704, 3), (0, 0, -1)), revolution_arc=90, mode=Mode.SUBTRACT)
    with BuildSketch(Plane(origin=(28.049294378, -8.743824417, 0), x_dir=(1, 0, 0), z_dir=(0, -1, 0))) as fillet1_2_piece_34:
        with BuildLine():
            CenterArc((1.5 + FILLET1_R, FILLET1_R), FILLET1_R, 180, 90)
            Line((1.5, FILLET1_R), (1.5, 0))
            Line((1.5, 0), (1.5 + FILLET1_R, 0))
        make_face()
    revolve(axis=Axis((28.049294378, -8.743824417, 0), (0, 0, 1)), mode=Mode.SUBTRACT)
    with BuildSketch(Plane(origin=(28.049294378, -8.743824417, 3), x_dir=(1, 0, 0), z_dir=(0, -1, 0))) as fillet1_2_piece_35:
        with BuildLine():
            CenterArc((1.5 + FILLET1_R, -FILLET1_R), FILLET1_R, 90, 90)
            Line((1.5, -FILLET1_R), (1.5, 0))
            Line((1.5, 0), (1.5 + FILLET1_R, 0))
        make_face()
    revolve(axis=Axis((28.049294378, -8.743824417, 3), (0, 0, 1)), mode=Mode.SUBTRACT)
    with BuildSketch(Plane(origin=(17.280570601, -19.075181704, 3), x_dir=(0, 1, 0), z_dir=(-1, 0, 0))) as fillet1_2_piece_36:
        with BuildLine():
            CenterArc((FILLET1_R, FILLET1_R), FILLET1_R, 180, 90)
            Line((0, FILLET1_R), (0, 0))
            Line((0, 0), (FILLET1_R, 0))
        make_face()
    extrude(amount=11.153457816, mode=Mode.SUBTRACT)
    with BuildSketch(Plane(origin=(20.554836452, -14.685842872, 3), x_dir=(-0.8502651466878635, 0.5263546146162928, 0), z_dir=(-0.5263546146162928, -0.8502651466878635, 0))) as fillet1_2_piece_37:
        with BuildLine():
            CenterArc((FILLET1_R, FILLET1_R), FILLET1_R, 180, 90)
            Line((0, FILLET1_R), (0, 0))
            Line((0, 0), (FILLET1_R, 0))
        make_face()
    extrude(amount=4.60526162, mode=Mode.SUBTRACT)
    with BuildSketch(Plane(origin=(24.824879418, -14.212197487, 3), x_dir=(0, 1, 0), z_dir=(-1, 0, 0))) as fillet1_2_piece_38:
        with BuildLine():
            CenterArc((FILLET1_R, FILLET1_R), FILLET1_R, 180, 90)
            Line((0, FILLET1_R), (0, 0))
            Line((0, 0), (FILLET1_R, 0))
        make_face()
    extrude(amount=3.419777819, mode=Mode.SUBTRACT)
    with BuildSketch(Plane(origin=(30.801713335, -7.224686262, 3), x_dir=(-1, 0, 0), z_dir=(0, -1, 0))) as fillet1_2_piece_39:
        with BuildLine():
            CenterArc((FILLET1_R, FILLET1_R), FILLET1_R, 180, 90)
            Line((0, FILLET1_R), (0, 0))
            Line((0, 0), (FILLET1_R, 0))
        make_face()
    extrude(amount=10.802638696, mode=Mode.SUBTRACT)
    with BuildSketch(Plane(origin=(25.824879418, -18.027324957, 3), x_dir=(1, 0, 0), z_dir=(0, 1, 0))) as fillet1_2_piece_40:
        with BuildLine():
            CenterArc((FILLET1_R, FILLET1_R), FILLET1_R, 180, 90)
            Line((0, FILLET1_R), (0, 0))
            Line((0, 0), (FILLET1_R, 0))
        make_face()
    extrude(amount=2.815127471, mode=Mode.SUBTRACT)
    with BuildSketch(Plane(origin=(29.801713335, -19.027324957, 3), x_dir=(0, 1, 0), z_dir=(-1, 0, 0))) as fillet1_2_piece_41:
        with BuildLine():
            CenterArc((FILLET1_R, FILLET1_R), FILLET1_R, 180, 90)
            Line((0, FILLET1_R), (0, 0))
            Line((0, 0), (FILLET1_R, 0))
        make_face()
    extrude(amount=2.976833917, mode=Mode.SUBTRACT)
    with BuildSketch(Plane(origin=(15.834228158, -6.224686262, 3), x_dir=(0, -1, 0), z_dir=(1, 0, 0))) as fillet1_2_piece_42:
        with BuildLine():
            CenterArc((FILLET1_R, FILLET1_R), FILLET1_R, 180, 90)
            Line((0, FILLET1_R), (0, 0))
            Line((0, 0), (FILLET1_R, 0))
        make_face()
    extrude(amount=13.967485176, mode=Mode.SUBTRACT)
    with BuildSketch(Plane(origin=(24.824879418, -15.212197487, 3), x_dir=(1, 0, 0), z_dir=(0, -1, 0))) as fillet1_2_piece_43:
        with BuildLine():
            CenterArc((1 + FILLET1_R, -FILLET1_R), FILLET1_R, 90, 90)
            Line((1, -FILLET1_R), (1, 0))
            Line((1, 0), (1 + FILLET1_R, 0))
        make_face()
    revolve(axis=Axis((24.824879418, -15.212197487, 3), (0, 0, 1)), revolution_arc=90, mode=Mode.SUBTRACT)
    with BuildSketch(Plane(origin=(21.405101599, -15.212197487, 3), x_dir=(0, 1, 0), z_dir=(1, 0, 0))) as fillet1_2_piece_44:
        with BuildLine():
            CenterArc((1 + FILLET1_R, -FILLET1_R), FILLET1_R, 90, 90)
            Line((1, -FILLET1_R), (1, 0))
            Line((1, 0), (1 + FILLET1_R, 0))
        make_face()
    revolve(axis=Axis((21.405101599, -15.212197487, 3), (0, 0, 1)), revolution_arc=58.240519915, mode=Mode.SUBTRACT)
    with BuildSketch(Plane(origin=(21.405101599, -15.212197487, 0), x_dir=(0, 1, 0), z_dir=(1, 0, 0))) as fillet1_2_piece_45:
        with BuildLine():
            CenterArc((1 + FILLET1_R, FILLET1_R), FILLET1_R, 180, 90)
            Line((1, FILLET1_R), (1, 0))
            Line((1, 0), (1 + FILLET1_R, 0))
        make_face()
    revolve(axis=Axis((21.405101599, -15.212197487, 0), (0, 0, 1)), revolution_arc=58.240519915, mode=Mode.SUBTRACT)
    with BuildSketch(Plane(origin=(24.824879418, -15.212197487, 0), x_dir=(1, 0, 0), z_dir=(0, -1, 0))) as fillet1_2_piece_46:
        with BuildLine():
            CenterArc((1 + FILLET1_R, FILLET1_R), FILLET1_R, 180, 90)
            Line((1, FILLET1_R), (1, 0))
            Line((1, 0), (1 + FILLET1_R, 0))
        make_face()
    revolve(axis=Axis((24.824879418, -15.212197487, 0), (0, 0, 1)), revolution_arc=90, mode=Mode.SUBTRACT)


solid = part.part
